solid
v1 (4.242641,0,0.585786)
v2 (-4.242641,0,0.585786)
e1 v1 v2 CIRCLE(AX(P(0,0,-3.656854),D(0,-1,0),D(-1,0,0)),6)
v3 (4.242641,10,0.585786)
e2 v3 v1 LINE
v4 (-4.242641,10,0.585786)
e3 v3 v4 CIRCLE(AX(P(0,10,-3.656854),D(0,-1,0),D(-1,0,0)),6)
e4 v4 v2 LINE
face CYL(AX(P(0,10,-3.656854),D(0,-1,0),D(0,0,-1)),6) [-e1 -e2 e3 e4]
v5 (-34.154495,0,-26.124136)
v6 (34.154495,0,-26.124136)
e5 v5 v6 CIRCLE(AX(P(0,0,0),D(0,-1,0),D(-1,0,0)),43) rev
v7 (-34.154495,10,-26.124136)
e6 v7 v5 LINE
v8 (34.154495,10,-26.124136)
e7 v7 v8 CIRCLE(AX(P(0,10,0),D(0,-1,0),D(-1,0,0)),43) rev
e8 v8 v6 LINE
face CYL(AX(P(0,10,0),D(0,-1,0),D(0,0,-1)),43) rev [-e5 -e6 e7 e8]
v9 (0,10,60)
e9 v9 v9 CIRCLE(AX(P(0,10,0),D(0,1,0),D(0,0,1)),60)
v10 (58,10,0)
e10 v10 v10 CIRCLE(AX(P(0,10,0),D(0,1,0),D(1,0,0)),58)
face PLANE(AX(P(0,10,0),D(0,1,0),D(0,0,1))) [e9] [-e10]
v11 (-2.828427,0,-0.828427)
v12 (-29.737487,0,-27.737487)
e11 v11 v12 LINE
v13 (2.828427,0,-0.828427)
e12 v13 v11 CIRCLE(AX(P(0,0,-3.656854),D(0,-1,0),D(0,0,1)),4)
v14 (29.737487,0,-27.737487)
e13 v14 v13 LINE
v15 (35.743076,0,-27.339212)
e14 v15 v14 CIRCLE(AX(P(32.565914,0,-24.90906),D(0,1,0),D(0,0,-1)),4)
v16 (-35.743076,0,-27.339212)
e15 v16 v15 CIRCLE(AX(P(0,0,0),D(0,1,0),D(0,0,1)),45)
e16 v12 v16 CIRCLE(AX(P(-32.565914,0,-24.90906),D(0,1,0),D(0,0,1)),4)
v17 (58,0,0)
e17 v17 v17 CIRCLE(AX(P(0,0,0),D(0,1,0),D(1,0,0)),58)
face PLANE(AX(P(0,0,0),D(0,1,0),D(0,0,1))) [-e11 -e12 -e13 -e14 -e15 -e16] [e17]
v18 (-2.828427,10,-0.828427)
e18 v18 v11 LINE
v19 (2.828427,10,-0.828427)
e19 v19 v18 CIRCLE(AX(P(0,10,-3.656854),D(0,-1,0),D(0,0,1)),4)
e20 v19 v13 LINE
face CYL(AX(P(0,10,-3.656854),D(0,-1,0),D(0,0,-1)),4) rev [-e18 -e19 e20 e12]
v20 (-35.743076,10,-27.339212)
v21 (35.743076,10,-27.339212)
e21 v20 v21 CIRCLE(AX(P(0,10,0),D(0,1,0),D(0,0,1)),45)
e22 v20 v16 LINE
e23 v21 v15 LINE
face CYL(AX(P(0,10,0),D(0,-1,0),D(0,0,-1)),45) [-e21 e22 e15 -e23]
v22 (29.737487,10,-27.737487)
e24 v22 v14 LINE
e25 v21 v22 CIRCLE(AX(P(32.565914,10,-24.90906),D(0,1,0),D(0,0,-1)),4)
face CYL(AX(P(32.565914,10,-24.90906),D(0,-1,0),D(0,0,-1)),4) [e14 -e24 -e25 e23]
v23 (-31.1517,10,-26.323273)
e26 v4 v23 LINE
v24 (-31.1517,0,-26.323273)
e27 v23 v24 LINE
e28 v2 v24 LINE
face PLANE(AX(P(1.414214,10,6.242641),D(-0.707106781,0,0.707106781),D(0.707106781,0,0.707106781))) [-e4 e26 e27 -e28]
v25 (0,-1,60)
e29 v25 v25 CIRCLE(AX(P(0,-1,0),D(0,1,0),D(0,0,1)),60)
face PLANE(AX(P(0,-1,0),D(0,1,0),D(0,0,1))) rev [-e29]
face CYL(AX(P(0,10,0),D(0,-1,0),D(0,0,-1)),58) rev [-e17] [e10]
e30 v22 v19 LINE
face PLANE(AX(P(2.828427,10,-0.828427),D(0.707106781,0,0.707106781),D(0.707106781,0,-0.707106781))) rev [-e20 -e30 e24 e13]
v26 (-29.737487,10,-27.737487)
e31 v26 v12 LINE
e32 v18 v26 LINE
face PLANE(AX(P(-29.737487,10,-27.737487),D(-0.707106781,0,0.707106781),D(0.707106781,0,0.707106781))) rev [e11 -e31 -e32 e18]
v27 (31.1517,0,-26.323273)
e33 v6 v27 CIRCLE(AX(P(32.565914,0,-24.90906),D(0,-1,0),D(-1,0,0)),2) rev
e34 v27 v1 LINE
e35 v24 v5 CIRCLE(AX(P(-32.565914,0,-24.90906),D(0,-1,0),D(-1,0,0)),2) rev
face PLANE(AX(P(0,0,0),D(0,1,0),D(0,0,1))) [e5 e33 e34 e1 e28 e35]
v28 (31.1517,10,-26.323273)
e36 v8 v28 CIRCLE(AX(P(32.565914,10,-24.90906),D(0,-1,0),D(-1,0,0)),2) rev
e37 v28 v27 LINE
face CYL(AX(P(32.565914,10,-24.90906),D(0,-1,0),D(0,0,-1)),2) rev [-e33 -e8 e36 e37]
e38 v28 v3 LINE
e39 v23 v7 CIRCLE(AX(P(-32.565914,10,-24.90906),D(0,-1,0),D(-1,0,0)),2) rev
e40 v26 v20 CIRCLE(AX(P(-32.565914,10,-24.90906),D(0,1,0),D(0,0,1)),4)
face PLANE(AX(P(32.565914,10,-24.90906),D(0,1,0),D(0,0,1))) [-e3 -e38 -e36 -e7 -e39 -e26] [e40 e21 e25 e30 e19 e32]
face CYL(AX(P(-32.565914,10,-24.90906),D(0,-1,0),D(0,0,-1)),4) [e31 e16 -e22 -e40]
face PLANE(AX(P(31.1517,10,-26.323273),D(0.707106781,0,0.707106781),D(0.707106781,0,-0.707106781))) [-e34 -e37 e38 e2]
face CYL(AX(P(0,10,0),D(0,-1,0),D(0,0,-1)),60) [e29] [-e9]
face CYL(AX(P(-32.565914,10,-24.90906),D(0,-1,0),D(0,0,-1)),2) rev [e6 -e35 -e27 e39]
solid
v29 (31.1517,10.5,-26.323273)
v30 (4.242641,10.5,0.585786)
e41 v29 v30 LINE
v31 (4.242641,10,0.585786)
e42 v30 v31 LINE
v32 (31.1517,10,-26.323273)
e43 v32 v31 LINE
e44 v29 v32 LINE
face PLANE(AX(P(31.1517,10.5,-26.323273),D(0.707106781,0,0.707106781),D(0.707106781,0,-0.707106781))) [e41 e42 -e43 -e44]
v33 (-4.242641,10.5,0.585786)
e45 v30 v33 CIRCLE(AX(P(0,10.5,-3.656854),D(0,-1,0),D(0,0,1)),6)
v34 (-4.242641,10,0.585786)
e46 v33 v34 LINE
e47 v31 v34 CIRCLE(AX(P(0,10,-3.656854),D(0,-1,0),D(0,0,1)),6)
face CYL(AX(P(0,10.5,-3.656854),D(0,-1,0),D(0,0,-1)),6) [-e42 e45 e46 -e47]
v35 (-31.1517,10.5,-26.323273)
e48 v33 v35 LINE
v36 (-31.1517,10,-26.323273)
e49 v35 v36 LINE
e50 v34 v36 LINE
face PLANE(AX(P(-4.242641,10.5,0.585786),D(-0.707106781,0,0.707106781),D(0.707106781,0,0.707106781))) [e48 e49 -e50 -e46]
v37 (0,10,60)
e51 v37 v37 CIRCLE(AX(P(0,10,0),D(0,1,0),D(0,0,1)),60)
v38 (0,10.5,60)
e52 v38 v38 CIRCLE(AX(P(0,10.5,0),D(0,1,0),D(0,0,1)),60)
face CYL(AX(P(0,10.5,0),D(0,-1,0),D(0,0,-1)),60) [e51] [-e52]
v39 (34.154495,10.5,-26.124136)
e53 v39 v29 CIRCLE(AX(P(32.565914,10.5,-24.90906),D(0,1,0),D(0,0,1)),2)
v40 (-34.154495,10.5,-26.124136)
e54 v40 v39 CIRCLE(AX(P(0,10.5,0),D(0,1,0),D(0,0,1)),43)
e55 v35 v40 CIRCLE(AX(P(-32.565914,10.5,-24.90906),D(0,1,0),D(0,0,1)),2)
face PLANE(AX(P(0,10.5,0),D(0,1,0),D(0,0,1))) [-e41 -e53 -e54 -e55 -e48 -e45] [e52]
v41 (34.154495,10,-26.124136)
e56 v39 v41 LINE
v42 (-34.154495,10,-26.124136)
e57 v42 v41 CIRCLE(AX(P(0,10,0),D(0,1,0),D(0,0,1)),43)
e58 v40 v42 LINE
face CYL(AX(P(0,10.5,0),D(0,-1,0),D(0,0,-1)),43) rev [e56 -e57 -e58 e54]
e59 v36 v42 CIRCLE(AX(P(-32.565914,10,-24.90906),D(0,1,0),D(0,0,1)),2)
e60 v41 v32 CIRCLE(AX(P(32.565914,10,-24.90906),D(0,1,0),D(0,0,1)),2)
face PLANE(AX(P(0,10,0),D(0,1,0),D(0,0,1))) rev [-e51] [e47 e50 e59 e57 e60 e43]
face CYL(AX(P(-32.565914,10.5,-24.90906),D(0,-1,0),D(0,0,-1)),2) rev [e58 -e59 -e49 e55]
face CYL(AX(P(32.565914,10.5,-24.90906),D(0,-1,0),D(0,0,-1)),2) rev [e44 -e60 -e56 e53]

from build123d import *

# Parameters (mm, degrees)
SKETCH1_R             = 60
SKETCH1_R_2           = 58
EXTRUDE_THIN1_DEPTH   = 10
EXTRUDE_THIN1_2_DEPTH = 10
BOSS_EXTRUDE1_START   = -1
SKETCH2_R             = 60
BOSS_EXTRUDE1_DEPTH   = 1
SKETCH4_R             = 60
BOSS_EXTRUDE3_DEPTH   = 0.5


with BuildPart() as part:
    # Sketch1 → Extrude-Thin1 (new body)
    with BuildSketch(Plane(origin=(0, 0, 0), x_dir=(1, 0, 0), z_dir=(0, 1, 0))):
        Circle(SKETCH1_R)
        Circle(SKETCH1_R_2, mode=Mode.SUBTRACT)
    extrude(amount=EXTRUDE_THIN1_DEPTH)



with BuildPart() as body_2:
    # Sketch1 → Extrude-Thin1 2 (new body)
    with BuildSketch(Plane(origin=(0, 0, 0), x_dir=(1, 0, 0), z_dir=(0, 1, 0))):
        with BuildLine():
            Line((-29.737486768, 27.737486768), (-2.828427125, 0.828427125))
            ThreePointArc((-2.828427125, 0.828427125), (0, -0.343145751), (2.828427125, 0.828427125))
            Line((2.828427125, 0.828427125), (29.737486768, 27.737486768))
            ThreePointArc((29.737486768, 27.737486768), (32.830602007, 28.900292561), (35.743076224, 27.339211804))
            ThreePointArc((35.743076224, 27.339211804), (0, -45), (-35.743076224, 27.339211804))
            ThreePointArc((-35.743076224, 27.339211804), (-32.830602007, 28.900292561), (-29.737486768, 27.737486768))
        make_face()
        with BuildLine():
            Line((-31.151700331, 26.323273206), (-4.242640687, -0.585786438))
            ThreePointArc((-4.242640687, -0.585786438), (0, -2.343145751), (4.242640687, -0.585786438))
            Line((4.242640687, -0.585786438), (31.151700331, 26.323273206))
            ThreePointArc((31.151700331, 26.323273206), (32.69825795, 26.904676102), (34.154495058, 26.124135724))
            ThreePointArc((34.154495058, 26.124135724), (0, -43), (-34.154495058, 26.124135724))
            ThreePointArc((-34.154495058, 26.124135724), (-32.69825795, 26.904676102), (-31.151700331, 26.323273206))
        make_face(mode=Mode.SUBTRACT)
    extrude(amount=EXTRUDE_THIN1_2_DEPTH)


with BuildPart() as part_1:
    add(part.part)

    add(body_2.part)  # Boss-Extrude1 merges body 2
    # Sketch2 → Boss-Extrude1 (add)
    with BuildSketch(Plane(origin=(0, 0, 0), x_dir=(1, 0, 0), z_dir=(0, 1, 0)).offset(BOSS_EXTRUDE1_START)):
        Circle(SKETCH2_R)
    extrude(amount=BOSS_EXTRUDE1_DEPTH)


with BuildPart() as body_2_2:
    # Sketch4 → Boss-Extrude3 (new body)
    with BuildSketch(Plane(origin=(0, 10, 0), x_dir=(1, 0, 0), z_dir=(0, 1, 0))):
        Circle(SKETCH4_R)
        with BuildLine():
            Line((-4.242640687, -0.585786438), (-31.151700331, 26.323273206))
            ThreePointArc((-31.151700331, 26.323273206), (-32.69825795, 26.904676102), (-34.154495058, 26.124135724))
            ThreePointArc((-34.154495058, 26.124135724), (0, -43), (34.154495058, 26.124135724))
            ThreePointArc((34.154495058, 26.124135724), (32.69825795, 26.904676102), (31.151700331, 26.323273206))
            Line((31.151700331, 26.323273206), (4.242640687, -0.585786438))
            ThreePointArc((4.242640687, -0.585786438), (0, -2.343145751), (-4.242640687, -0.585786438))
        make_face(mode=Mode.SUBTRACT)
    extrude(amount=BOSS_EXTRUDE3_DEPTH)


solid = Compound([part_1.part, body_2_2.part])
